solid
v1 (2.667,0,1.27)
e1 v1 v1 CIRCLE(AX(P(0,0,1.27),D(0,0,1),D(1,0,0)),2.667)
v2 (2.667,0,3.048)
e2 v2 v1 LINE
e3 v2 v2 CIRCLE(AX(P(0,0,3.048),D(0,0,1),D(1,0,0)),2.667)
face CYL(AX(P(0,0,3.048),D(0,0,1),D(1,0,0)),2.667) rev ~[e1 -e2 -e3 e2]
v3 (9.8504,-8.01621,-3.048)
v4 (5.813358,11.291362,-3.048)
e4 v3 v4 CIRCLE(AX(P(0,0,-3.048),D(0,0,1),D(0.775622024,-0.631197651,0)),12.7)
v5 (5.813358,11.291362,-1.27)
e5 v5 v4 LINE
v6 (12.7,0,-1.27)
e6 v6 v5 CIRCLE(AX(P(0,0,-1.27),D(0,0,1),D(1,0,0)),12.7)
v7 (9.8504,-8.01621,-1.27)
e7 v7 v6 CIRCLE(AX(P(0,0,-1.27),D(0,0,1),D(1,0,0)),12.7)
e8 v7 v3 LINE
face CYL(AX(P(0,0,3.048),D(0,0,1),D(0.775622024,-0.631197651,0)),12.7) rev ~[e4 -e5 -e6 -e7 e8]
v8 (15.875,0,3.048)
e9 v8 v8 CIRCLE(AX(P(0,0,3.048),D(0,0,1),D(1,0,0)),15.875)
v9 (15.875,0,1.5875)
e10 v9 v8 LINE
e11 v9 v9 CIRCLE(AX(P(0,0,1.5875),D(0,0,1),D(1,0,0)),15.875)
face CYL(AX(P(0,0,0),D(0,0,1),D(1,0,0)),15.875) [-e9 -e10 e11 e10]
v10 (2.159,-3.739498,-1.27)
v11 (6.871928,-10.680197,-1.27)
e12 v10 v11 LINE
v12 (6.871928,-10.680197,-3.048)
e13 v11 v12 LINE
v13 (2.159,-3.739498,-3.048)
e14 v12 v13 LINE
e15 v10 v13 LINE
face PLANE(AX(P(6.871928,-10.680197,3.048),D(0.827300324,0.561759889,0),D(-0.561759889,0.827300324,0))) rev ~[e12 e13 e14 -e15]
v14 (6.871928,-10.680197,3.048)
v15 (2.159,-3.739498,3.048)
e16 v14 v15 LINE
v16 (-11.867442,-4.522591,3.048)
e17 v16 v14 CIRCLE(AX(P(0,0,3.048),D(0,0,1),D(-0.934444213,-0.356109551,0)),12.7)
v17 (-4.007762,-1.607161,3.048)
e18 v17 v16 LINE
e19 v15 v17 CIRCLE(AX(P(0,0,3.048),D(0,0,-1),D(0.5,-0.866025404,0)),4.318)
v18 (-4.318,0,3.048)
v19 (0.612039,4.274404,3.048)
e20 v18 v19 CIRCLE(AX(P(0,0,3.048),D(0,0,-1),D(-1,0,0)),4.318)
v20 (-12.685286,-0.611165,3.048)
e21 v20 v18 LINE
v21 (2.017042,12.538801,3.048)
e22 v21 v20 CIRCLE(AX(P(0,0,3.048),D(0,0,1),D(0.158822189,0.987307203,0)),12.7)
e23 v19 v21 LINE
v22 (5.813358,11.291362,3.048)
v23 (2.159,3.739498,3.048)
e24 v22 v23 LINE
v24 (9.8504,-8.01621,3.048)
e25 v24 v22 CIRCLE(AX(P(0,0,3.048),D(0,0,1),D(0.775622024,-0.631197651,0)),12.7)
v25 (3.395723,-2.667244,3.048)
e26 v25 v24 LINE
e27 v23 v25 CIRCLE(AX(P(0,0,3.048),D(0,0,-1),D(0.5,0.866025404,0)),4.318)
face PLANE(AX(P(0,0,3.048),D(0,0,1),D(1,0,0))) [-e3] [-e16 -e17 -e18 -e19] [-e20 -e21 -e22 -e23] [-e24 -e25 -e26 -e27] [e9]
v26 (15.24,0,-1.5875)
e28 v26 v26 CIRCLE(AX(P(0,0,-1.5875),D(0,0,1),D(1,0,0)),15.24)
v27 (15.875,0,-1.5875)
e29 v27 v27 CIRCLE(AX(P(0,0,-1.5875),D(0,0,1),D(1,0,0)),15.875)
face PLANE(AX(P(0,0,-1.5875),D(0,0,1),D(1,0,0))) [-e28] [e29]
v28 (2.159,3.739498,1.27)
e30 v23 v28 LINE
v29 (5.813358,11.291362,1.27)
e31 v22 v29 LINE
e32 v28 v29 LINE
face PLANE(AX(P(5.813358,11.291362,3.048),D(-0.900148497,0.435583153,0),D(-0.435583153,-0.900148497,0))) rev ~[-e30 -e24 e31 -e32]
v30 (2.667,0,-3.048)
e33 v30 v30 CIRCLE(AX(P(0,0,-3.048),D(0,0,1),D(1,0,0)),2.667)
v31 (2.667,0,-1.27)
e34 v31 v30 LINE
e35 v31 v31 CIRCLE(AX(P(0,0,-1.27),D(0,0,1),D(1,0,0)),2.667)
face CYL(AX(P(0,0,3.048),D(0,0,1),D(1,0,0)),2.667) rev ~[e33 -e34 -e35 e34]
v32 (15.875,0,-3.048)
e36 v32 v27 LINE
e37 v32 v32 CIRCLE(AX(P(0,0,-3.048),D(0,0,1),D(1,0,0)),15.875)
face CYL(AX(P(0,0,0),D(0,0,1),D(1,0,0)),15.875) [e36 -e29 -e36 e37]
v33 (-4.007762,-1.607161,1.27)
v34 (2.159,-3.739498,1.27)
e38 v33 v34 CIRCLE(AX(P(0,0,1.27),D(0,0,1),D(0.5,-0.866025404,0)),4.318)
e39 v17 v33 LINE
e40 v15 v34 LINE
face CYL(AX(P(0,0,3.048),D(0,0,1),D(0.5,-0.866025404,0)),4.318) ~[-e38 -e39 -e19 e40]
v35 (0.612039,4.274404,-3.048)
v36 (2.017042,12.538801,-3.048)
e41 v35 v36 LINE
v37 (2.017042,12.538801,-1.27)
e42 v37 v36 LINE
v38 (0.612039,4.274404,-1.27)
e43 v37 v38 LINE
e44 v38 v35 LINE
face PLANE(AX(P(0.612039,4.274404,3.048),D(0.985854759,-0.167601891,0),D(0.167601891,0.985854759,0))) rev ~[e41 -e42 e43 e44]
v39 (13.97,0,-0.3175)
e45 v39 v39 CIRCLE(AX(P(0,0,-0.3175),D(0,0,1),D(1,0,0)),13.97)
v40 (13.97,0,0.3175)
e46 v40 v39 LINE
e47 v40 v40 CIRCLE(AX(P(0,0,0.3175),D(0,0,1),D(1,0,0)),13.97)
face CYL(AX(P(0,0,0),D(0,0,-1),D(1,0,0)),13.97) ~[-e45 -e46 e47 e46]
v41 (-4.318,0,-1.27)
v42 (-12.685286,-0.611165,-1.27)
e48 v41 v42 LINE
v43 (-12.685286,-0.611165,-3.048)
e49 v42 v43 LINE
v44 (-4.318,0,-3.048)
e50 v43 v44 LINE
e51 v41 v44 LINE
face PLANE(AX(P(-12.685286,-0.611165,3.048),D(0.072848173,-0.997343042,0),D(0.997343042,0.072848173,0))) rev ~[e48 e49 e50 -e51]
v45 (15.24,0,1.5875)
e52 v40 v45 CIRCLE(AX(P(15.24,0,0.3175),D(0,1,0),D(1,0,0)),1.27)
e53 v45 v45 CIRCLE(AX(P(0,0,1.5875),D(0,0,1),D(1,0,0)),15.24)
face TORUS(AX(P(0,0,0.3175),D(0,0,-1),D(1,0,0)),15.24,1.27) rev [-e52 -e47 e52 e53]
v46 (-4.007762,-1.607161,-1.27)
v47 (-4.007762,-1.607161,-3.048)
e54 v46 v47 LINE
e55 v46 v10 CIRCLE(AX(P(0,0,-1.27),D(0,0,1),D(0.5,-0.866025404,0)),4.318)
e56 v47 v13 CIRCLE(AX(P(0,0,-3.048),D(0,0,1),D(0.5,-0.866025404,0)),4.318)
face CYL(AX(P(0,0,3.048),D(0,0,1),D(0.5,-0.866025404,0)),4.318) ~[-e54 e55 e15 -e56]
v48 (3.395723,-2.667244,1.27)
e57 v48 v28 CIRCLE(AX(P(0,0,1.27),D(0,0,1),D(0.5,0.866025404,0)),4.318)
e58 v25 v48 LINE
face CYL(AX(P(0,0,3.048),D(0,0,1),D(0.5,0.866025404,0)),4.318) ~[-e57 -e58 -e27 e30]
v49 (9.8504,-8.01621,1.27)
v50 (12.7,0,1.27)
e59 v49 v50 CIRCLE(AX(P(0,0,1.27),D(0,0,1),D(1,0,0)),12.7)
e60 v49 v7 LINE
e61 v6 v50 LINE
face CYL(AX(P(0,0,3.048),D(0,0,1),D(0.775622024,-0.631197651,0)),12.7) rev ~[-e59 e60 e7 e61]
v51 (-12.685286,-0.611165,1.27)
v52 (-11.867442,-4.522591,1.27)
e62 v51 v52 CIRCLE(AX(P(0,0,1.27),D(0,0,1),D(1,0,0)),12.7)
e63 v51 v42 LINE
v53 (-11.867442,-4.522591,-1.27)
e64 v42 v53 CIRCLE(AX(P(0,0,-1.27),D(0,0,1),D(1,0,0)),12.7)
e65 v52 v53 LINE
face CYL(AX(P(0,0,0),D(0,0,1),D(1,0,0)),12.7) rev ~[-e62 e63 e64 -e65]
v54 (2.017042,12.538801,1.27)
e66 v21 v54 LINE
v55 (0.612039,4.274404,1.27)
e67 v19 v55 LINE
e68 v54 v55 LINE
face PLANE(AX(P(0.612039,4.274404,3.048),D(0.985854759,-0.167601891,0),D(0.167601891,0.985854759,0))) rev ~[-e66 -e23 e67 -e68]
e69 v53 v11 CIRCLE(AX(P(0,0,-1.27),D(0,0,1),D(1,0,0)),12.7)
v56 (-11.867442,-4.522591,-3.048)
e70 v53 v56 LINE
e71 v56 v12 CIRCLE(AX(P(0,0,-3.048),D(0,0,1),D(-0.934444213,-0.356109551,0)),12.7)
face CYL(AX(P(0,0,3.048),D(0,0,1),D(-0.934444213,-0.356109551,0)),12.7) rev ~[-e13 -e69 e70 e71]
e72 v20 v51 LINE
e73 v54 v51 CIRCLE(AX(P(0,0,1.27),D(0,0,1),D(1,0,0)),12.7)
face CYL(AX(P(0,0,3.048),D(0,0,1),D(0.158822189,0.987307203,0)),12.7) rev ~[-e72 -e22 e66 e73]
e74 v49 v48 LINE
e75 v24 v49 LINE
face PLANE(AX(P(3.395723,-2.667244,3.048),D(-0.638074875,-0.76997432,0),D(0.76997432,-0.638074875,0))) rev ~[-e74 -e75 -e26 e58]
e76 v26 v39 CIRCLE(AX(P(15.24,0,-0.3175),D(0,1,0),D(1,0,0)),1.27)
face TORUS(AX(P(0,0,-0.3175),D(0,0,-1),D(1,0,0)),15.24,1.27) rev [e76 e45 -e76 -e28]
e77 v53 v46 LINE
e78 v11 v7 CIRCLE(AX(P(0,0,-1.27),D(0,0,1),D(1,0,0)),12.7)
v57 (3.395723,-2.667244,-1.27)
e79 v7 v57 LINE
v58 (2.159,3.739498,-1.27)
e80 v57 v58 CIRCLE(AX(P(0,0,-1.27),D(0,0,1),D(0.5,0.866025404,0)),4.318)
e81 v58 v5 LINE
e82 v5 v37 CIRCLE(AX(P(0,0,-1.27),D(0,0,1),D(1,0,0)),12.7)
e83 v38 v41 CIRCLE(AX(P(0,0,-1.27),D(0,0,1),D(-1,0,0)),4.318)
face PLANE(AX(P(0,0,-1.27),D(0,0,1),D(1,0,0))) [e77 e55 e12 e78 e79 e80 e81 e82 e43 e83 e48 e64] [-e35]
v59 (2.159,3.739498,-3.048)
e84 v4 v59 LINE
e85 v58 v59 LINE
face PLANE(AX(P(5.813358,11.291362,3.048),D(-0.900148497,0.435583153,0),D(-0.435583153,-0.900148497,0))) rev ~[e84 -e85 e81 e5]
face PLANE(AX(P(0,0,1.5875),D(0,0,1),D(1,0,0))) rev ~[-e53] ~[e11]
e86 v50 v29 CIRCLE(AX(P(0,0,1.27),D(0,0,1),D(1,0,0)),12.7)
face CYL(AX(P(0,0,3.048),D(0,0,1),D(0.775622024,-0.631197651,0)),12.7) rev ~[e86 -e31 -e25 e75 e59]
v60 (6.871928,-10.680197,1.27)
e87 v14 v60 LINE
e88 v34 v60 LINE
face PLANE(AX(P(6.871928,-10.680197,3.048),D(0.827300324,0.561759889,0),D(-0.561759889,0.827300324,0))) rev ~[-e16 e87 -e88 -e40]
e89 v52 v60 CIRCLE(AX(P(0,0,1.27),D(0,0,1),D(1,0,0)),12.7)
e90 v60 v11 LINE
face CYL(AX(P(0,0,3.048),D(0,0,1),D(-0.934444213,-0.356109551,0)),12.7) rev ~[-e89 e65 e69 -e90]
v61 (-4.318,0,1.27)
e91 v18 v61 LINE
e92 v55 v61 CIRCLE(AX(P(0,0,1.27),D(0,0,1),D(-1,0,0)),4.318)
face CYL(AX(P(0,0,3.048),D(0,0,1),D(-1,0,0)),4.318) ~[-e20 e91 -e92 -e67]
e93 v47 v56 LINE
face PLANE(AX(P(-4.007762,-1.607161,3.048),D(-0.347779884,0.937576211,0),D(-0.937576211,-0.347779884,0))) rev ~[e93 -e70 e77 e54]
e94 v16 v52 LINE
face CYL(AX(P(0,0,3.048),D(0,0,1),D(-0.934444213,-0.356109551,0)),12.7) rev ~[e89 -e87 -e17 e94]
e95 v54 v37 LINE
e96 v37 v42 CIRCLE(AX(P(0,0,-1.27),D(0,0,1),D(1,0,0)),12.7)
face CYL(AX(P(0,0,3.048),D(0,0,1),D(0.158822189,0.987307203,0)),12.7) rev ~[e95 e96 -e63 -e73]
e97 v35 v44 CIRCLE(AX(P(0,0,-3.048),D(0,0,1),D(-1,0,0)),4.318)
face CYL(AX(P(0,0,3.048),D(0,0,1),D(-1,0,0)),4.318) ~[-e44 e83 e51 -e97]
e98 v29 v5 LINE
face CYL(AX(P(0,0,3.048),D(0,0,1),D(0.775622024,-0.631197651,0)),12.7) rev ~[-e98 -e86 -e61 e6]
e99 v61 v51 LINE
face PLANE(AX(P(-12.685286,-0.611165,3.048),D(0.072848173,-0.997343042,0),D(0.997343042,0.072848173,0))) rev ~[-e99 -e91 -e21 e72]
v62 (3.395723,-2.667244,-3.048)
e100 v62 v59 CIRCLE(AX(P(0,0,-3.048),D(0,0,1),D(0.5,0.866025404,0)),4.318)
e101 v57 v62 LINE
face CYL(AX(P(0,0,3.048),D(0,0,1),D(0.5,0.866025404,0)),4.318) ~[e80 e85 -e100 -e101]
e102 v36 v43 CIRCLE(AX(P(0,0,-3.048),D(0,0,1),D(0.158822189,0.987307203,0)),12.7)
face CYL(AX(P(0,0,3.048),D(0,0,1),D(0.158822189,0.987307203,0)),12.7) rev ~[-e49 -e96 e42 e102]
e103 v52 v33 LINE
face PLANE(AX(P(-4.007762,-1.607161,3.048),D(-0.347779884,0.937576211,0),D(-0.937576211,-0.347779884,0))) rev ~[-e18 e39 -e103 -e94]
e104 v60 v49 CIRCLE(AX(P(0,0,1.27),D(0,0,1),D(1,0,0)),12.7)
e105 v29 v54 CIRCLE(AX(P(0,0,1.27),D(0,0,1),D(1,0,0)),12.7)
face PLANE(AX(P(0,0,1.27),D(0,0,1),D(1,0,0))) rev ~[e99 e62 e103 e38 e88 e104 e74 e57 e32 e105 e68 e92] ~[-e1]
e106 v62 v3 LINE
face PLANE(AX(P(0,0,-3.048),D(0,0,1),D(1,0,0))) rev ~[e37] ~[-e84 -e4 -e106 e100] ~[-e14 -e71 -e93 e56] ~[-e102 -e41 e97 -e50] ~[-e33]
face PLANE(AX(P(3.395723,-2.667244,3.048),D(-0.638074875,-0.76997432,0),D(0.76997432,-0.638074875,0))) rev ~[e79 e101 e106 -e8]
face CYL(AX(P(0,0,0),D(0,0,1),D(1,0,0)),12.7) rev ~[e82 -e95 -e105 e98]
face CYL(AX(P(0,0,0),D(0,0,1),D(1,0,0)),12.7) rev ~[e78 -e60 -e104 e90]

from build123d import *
from build123d import SkipClean  # not in build123d's __all__

# Parameters (mm, degrees)
F0_R     = 15.875
F1_DEPTH = 3.048
F2_R     = 17.9958283003
F2_R_2   = 13.97
F3_DEPTH = 1.5875
F4_R     = 2.667
F5_DEPTH = 6.097
F6_R     = 1.27
F7_R     = 12.7
F8_DEPTH = 1.27


with BuildPart() as f1:
    # F0 (on Top) → F1 (new body, symmetric)
    with BuildSketch(Plane.XY):
        Circle(F0_R)
    extrude(amount=F1_DEPTH, both=True)

    # F2 (on Top) → F3 (cut, symmetric)
    with BuildSketch(Plane.XY):
        Circle(F2_R)
        Circle(F2_R_2, mode=Mode.SUBTRACT)
    extrude(amount=F3_DEPTH, both=True, mode=Mode.SUBTRACT)

    # F4 (on face) → F5 (cut, through all)
    with BuildSketch(Plane.XY.offset(3.048)):
        with BuildLine():
            Line((0.6120390991, 4.2744043025), (2.0170417977, 12.5388014733))
            ThreePointArc((2.0170417977, 12.5388014733), (-8.4665969818, 9.4660834323), (-12.6852858441, -0.6111653244))
            Line((-12.6852858441, -0.6111653244), (-4.318, 0))
            ThreePointArc((-4.318, 0), (-2.8286338726, 3.2625073816), (0.6120390991, 4.2744043025))
        make_face()
        Circle(F4_R)
        with BuildLine():
            ThreePointArc((2.159, -3.7394976935), (-1.4110973362, -4.0809224824), (-4.0077622616, -1.6071607433))
            Line((-4.0077622616, -1.6071607433), (-11.8674415077, -4.5225912993))
            ThreePointArc((-11.8674415077, -4.5225912993), (-3.9645702358, -12.065329786), (6.8719276189, -10.6801971331))
            Line((6.8719276189, -10.6801971331), (2.159, -3.7394976935))
        make_face()
        with BuildLine():
            ThreePointArc((2.159, 3.7394976935), (4.2397312088, 0.8184151008), (3.3957231624, -2.6672435592))
            Line((3.3957231624, -2.6672435592), (9.85039971, -8.016210174))
            ThreePointArc((9.85039971, -8.016210174), (12.4311672176, 2.5992463537), (5.8133582252, 11.2913624574))
            Line((5.8133582252, 11.2913624574), (2.159, 3.7394976935))
        make_face()
    extrude(amount=-F5_DEPTH, mode=Mode.SUBTRACT)

    # F6
    f6_edges = [f1.edges().sort_by_distance(p)[0] for p in [
        (-13.97, 0, -1.5875),
        (-13.97, 0, 1.5875),
    ]]
    fillet(f6_edges, radius=F6_R)

    # F7 (on Top) → F8 (cut, symmetric)
    with BuildSketch(Plane.XY):
        Circle(F7_R)
    with SkipClean():  # cleaning this boolean's faces spoils the solid; the shape is the same uncleaned
        extrude(amount=F8_DEPTH, both=True, mode=Mode.SUBTRACT)


solid = f1.part
